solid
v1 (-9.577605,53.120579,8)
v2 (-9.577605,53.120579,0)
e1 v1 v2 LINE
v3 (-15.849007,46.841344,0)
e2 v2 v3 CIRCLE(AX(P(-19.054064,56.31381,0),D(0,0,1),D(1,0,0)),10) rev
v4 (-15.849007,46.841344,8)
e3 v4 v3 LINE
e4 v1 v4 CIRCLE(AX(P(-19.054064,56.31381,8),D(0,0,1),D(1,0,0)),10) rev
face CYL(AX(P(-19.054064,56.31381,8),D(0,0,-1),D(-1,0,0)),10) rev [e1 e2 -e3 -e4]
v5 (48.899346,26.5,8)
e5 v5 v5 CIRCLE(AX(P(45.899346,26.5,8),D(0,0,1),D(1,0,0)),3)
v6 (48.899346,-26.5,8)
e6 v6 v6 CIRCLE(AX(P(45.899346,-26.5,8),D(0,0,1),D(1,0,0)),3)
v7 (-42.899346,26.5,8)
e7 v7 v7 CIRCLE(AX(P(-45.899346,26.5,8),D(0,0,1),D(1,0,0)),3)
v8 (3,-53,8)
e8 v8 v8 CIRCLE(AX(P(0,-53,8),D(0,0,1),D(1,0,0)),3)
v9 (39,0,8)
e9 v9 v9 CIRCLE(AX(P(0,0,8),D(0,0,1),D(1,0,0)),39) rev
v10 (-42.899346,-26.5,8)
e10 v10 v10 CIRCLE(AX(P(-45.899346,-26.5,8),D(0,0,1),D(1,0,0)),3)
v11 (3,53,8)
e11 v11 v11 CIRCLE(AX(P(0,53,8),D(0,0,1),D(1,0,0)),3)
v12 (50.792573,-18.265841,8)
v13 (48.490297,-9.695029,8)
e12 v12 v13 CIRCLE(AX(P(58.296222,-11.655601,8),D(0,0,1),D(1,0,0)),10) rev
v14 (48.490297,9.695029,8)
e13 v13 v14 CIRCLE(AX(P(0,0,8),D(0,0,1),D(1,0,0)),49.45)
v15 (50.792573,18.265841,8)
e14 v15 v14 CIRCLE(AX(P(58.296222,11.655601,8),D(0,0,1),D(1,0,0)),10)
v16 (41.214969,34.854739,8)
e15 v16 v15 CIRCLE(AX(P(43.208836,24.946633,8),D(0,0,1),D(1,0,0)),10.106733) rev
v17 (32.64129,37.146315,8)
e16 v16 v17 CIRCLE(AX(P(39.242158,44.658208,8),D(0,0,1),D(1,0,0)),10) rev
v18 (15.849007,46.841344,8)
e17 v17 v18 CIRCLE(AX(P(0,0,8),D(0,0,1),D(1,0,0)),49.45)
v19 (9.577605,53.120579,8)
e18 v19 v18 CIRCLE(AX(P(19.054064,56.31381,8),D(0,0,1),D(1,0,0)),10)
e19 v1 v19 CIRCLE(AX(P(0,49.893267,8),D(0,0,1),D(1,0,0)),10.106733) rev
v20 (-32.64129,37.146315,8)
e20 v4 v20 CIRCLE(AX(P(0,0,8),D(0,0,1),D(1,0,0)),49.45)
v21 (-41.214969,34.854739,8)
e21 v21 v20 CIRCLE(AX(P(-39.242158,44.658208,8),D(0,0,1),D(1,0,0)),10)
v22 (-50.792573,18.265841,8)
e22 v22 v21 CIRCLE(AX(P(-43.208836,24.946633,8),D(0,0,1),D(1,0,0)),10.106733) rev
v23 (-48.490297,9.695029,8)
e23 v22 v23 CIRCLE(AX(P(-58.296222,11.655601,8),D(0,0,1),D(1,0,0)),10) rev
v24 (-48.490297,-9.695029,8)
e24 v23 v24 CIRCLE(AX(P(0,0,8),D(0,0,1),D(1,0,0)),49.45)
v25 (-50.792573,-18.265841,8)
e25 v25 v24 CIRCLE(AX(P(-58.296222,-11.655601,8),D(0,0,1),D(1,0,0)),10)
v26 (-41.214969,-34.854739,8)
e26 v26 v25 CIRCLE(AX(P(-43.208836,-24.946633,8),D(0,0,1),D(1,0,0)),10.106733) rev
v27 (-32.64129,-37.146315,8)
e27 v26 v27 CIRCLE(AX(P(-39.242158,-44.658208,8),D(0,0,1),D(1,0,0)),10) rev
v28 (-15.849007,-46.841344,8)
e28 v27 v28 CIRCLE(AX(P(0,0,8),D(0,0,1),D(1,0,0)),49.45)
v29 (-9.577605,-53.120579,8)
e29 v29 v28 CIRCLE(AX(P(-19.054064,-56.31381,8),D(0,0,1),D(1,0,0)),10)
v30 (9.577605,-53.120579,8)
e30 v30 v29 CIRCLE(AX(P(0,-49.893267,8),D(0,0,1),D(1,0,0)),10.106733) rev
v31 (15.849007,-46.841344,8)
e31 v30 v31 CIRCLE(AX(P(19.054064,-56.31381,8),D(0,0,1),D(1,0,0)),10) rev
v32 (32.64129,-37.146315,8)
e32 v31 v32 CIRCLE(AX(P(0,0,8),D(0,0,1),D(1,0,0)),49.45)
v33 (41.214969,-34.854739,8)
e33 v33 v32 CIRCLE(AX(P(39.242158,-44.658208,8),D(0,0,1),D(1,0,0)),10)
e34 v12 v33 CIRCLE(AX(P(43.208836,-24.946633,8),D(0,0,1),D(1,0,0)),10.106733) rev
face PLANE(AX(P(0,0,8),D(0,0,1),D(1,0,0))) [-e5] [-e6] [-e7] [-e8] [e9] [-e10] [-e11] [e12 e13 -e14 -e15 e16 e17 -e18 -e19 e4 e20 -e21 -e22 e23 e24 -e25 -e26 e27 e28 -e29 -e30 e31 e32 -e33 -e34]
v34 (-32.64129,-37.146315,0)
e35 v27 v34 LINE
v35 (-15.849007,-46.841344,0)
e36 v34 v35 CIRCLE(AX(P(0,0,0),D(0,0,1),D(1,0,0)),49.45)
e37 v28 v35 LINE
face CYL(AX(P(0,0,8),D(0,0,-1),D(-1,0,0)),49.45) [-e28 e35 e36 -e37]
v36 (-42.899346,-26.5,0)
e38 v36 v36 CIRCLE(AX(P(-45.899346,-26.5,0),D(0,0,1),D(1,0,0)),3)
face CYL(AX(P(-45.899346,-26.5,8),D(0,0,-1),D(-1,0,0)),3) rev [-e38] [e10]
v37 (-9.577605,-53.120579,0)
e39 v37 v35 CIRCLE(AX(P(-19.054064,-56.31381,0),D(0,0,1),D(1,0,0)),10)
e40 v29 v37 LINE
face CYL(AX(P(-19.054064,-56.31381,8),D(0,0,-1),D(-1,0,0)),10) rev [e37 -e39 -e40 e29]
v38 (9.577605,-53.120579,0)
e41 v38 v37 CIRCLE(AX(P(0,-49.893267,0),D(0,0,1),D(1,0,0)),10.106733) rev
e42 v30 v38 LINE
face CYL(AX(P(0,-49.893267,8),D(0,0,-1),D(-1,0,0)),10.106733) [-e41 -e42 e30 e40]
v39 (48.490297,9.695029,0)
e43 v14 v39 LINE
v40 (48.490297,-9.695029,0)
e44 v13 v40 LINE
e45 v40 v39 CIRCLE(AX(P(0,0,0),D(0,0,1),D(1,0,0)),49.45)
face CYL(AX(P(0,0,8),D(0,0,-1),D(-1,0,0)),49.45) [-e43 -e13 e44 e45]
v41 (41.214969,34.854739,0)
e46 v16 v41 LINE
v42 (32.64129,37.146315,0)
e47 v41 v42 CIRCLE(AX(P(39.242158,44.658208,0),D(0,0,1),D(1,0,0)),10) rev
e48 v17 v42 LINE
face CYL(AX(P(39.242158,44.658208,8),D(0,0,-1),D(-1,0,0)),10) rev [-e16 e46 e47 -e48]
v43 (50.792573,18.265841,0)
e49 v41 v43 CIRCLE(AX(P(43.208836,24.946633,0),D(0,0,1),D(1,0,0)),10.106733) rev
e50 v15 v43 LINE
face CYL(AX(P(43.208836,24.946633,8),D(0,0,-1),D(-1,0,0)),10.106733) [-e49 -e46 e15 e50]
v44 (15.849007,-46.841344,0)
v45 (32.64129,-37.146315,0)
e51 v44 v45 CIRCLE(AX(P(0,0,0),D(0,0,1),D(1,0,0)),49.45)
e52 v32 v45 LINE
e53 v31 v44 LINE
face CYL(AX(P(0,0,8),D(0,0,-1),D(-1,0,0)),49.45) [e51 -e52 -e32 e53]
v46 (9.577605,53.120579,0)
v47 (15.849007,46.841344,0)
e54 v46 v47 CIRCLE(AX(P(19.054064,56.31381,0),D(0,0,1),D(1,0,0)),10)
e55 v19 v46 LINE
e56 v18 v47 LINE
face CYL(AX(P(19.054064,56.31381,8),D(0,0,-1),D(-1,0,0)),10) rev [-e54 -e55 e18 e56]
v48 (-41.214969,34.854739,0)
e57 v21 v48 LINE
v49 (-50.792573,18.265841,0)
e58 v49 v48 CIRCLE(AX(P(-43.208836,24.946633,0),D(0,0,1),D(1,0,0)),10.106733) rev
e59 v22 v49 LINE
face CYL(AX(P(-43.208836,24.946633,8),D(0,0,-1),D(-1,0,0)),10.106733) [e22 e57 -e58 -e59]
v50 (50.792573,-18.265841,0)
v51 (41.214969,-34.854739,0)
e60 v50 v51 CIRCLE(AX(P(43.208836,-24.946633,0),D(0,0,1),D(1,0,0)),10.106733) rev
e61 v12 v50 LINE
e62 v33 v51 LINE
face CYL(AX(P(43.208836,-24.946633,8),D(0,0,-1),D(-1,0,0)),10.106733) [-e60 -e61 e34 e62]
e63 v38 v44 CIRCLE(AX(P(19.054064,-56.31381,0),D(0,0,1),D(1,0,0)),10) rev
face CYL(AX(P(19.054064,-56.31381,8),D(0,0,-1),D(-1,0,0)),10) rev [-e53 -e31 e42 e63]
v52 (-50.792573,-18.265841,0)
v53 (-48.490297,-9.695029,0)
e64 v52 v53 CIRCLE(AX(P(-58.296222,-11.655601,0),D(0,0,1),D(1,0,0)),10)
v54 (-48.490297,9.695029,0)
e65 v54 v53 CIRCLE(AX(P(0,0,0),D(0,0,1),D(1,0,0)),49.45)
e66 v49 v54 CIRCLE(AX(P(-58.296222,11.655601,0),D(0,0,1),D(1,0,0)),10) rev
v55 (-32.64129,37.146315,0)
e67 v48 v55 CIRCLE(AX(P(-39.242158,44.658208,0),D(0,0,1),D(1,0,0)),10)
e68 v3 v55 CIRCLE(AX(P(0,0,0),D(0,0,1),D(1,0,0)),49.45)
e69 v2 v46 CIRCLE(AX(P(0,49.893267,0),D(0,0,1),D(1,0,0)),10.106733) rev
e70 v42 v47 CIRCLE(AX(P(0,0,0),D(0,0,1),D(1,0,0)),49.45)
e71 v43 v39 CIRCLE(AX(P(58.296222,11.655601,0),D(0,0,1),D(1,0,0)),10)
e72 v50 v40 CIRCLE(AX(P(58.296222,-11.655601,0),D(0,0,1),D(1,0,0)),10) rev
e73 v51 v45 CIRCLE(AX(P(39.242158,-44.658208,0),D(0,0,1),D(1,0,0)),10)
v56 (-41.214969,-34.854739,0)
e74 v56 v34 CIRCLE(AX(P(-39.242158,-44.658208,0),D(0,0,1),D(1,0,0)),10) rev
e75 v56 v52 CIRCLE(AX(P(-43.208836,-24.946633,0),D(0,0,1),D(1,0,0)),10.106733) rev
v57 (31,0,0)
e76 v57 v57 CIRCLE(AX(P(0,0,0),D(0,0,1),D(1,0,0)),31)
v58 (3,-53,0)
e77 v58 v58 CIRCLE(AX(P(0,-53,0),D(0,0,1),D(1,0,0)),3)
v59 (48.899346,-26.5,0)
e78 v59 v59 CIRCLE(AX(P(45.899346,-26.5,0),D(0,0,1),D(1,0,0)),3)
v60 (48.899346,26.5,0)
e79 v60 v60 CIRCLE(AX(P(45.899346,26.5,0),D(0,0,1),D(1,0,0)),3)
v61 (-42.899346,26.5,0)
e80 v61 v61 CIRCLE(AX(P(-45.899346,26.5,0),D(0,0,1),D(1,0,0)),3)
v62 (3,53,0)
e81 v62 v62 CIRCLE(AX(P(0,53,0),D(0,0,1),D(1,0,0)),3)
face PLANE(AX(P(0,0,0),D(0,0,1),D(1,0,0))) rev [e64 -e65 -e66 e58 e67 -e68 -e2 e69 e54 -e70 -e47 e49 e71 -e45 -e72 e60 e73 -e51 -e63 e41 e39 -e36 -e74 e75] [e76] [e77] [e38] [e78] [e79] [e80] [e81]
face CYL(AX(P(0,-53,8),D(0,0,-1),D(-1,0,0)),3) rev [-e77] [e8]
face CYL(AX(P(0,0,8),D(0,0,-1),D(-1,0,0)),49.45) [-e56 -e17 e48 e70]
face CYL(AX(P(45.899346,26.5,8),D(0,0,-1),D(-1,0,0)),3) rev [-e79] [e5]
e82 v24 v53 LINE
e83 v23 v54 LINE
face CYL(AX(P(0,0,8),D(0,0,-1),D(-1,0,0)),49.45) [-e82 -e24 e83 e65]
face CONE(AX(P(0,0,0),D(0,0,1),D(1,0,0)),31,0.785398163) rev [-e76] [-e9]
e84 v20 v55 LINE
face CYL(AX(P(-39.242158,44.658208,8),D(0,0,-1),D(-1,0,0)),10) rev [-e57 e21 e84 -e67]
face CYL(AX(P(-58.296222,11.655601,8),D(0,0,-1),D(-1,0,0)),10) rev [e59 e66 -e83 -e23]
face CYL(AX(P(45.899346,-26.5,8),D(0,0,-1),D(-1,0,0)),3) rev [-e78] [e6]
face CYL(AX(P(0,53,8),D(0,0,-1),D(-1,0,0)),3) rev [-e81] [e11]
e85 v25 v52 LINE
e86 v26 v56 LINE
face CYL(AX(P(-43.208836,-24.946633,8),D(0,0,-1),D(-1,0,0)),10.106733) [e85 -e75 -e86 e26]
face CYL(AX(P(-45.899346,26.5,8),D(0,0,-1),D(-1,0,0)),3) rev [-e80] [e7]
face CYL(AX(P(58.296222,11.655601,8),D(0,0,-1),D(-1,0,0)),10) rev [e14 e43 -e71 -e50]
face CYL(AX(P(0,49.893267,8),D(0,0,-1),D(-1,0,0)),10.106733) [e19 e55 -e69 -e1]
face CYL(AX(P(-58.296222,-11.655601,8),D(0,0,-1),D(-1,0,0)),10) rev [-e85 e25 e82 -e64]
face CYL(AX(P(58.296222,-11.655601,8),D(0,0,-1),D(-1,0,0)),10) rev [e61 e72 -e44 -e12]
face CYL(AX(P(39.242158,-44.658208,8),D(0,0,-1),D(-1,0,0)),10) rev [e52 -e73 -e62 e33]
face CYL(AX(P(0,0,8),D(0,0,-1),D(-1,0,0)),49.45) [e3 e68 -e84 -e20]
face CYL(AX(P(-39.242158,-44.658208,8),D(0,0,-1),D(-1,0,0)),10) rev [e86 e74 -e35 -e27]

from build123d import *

# Parameters (mm, degrees)
SKETCH2_R           = 3
SKETCH2_R_2         = 31
BOSS_EXTRUDE1_DEPTH = 8
CHAMFER1_SIZE       = 8


with BuildPart() as part:
    # Sketch2 → Boss-Extrude1 (new body)
    with BuildSketch(Plane.XY):
        with BuildLine():
            ThreePointArc((50.792573497, 18.265840665), (51.961524227, 30), (41.214968786, 34.85473864))
            ThreePointArc((41.214968786, 34.85473864), (36.65999643, 34.997336465), (32.641290086, 37.146314508))
            ThreePointArc((32.641290086, 37.146314508), (24.725, 42.824956217), (15.849006977, 46.841343681))
            ThreePointArc((15.849006977, 46.841343681), (11.978584229, 49.247156444), (9.577604711, 53.120579305))
            ThreePointArc((9.577604711, 53.120579305), (0, 60), (-9.577604711, 53.120579305))
            ThreePointArc((-9.577604711, 53.120579305), (-11.978584229, 49.247156444), (-15.849006977, 46.841343681))
            ThreePointArc((-15.849006977, 46.841343681), (-24.725, 42.824956217), (-32.641290086, 37.146314508))
            ThreePointArc((-32.641290086, 37.146314508), (-36.65999643, 34.997336465), (-41.214968786, 34.85473864))
            ThreePointArc((-41.214968786, 34.85473864), (-51.961524227, 30), (-50.792573497, 18.265840665))
            ThreePointArc((-50.792573497, 18.265840665), (-48.638580659, 14.249819979), (-48.490297064, 9.695029173))
            ThreePointArc((-48.490297064, 9.695029173), (-49.45, 0), (-48.490297064, -9.695029173))
            ThreePointArc((-48.490297064, -9.695029173), (-48.638580659, -14.249819979), (-50.792573497, -18.265840665))
            ThreePointArc((-50.792573497, -18.265840665), (-51.961524227, -30), (-41.214968786, -34.85473864))
            ThreePointArc((-41.214968786, -34.85473864), (-36.65999643, -34.997336465), (-32.641290086, -37.146314508))
            ThreePointArc((-32.641290086, -37.146314508), (-24.725, -42.824956217), (-15.849006977, -46.841343681))
            ThreePointArc((-15.849006977, -46.841343681), (-11.978584229, -49.247156444), (-9.577604711, -53.120579305))
            ThreePointArc((-9.577604711, -53.120579305), (0, -60), (9.577604711, -53.120579305))
            ThreePointArc((9.577604711, -53.120579305), (11.978584229, -49.247156444), (15.849006977, -46.841343681))
            ThreePointArc((15.849006977, -46.841343681), (24.725, -42.824956217), (32.641290086, -37.146314508))
            ThreePointArc((32.641290086, -37.146314508), (36.65999643, -34.997336465), (41.214968786, -34.85473864))
            ThreePointArc((41.214968786, -34.85473864), (51.961524227, -30), (50.792573497, -18.265840665))
            ThreePointArc((50.792573497, -18.265840665), (48.638580659, -14.249819979), (48.490297064, -9.695029173))
            ThreePointArc((48.490297064, -9.695029173), (49.45, 0), (48.490297064, 9.695029173))
            ThreePointArc((48.490297064, 9.695029173), (48.638580659, 14.249819979), (50.792573497, 18.265840665))
        make_face()
        with Locations((45.899346401, 26.5)):
            Circle(SKETCH2_R, mode=Mode.SUBTRACT)
        with Locations((0, 53)):
            Circle(SKETCH2_R, mode=Mode.SUBTRACT)
        Circle(SKETCH2_R_2, mode=Mode.SUBTRACT)
        with Locations((45.899346401, -26.5)):
            Circle(SKETCH2_R, mode=Mode.SUBTRACT)
        with Locations((0, -53)):
            Circle(SKETCH2_R, mode=Mode.SUBTRACT)
        with Locations((-45.899346401, 26.5)):
            Circle(SKETCH2_R, mode=Mode.SUBTRACT)
        with Locations((-45.899346401, -26.5)):
            Circle(SKETCH2_R, mode=Mode.SUBTRACT)
    extrude(amount=BOSS_EXTRUDE1_DEPTH)

    # Chamfer1
    chamfer1_edges = [part.edges().sort_by_distance(p)[0] for p in [
        (-31, 0, 8),
    ]]
    chamfer(chamfer1_edges, length=CHAMFER1_SIZE - 0.0001)  # a hair under: the kernel refuses the full size


solid = part.part
